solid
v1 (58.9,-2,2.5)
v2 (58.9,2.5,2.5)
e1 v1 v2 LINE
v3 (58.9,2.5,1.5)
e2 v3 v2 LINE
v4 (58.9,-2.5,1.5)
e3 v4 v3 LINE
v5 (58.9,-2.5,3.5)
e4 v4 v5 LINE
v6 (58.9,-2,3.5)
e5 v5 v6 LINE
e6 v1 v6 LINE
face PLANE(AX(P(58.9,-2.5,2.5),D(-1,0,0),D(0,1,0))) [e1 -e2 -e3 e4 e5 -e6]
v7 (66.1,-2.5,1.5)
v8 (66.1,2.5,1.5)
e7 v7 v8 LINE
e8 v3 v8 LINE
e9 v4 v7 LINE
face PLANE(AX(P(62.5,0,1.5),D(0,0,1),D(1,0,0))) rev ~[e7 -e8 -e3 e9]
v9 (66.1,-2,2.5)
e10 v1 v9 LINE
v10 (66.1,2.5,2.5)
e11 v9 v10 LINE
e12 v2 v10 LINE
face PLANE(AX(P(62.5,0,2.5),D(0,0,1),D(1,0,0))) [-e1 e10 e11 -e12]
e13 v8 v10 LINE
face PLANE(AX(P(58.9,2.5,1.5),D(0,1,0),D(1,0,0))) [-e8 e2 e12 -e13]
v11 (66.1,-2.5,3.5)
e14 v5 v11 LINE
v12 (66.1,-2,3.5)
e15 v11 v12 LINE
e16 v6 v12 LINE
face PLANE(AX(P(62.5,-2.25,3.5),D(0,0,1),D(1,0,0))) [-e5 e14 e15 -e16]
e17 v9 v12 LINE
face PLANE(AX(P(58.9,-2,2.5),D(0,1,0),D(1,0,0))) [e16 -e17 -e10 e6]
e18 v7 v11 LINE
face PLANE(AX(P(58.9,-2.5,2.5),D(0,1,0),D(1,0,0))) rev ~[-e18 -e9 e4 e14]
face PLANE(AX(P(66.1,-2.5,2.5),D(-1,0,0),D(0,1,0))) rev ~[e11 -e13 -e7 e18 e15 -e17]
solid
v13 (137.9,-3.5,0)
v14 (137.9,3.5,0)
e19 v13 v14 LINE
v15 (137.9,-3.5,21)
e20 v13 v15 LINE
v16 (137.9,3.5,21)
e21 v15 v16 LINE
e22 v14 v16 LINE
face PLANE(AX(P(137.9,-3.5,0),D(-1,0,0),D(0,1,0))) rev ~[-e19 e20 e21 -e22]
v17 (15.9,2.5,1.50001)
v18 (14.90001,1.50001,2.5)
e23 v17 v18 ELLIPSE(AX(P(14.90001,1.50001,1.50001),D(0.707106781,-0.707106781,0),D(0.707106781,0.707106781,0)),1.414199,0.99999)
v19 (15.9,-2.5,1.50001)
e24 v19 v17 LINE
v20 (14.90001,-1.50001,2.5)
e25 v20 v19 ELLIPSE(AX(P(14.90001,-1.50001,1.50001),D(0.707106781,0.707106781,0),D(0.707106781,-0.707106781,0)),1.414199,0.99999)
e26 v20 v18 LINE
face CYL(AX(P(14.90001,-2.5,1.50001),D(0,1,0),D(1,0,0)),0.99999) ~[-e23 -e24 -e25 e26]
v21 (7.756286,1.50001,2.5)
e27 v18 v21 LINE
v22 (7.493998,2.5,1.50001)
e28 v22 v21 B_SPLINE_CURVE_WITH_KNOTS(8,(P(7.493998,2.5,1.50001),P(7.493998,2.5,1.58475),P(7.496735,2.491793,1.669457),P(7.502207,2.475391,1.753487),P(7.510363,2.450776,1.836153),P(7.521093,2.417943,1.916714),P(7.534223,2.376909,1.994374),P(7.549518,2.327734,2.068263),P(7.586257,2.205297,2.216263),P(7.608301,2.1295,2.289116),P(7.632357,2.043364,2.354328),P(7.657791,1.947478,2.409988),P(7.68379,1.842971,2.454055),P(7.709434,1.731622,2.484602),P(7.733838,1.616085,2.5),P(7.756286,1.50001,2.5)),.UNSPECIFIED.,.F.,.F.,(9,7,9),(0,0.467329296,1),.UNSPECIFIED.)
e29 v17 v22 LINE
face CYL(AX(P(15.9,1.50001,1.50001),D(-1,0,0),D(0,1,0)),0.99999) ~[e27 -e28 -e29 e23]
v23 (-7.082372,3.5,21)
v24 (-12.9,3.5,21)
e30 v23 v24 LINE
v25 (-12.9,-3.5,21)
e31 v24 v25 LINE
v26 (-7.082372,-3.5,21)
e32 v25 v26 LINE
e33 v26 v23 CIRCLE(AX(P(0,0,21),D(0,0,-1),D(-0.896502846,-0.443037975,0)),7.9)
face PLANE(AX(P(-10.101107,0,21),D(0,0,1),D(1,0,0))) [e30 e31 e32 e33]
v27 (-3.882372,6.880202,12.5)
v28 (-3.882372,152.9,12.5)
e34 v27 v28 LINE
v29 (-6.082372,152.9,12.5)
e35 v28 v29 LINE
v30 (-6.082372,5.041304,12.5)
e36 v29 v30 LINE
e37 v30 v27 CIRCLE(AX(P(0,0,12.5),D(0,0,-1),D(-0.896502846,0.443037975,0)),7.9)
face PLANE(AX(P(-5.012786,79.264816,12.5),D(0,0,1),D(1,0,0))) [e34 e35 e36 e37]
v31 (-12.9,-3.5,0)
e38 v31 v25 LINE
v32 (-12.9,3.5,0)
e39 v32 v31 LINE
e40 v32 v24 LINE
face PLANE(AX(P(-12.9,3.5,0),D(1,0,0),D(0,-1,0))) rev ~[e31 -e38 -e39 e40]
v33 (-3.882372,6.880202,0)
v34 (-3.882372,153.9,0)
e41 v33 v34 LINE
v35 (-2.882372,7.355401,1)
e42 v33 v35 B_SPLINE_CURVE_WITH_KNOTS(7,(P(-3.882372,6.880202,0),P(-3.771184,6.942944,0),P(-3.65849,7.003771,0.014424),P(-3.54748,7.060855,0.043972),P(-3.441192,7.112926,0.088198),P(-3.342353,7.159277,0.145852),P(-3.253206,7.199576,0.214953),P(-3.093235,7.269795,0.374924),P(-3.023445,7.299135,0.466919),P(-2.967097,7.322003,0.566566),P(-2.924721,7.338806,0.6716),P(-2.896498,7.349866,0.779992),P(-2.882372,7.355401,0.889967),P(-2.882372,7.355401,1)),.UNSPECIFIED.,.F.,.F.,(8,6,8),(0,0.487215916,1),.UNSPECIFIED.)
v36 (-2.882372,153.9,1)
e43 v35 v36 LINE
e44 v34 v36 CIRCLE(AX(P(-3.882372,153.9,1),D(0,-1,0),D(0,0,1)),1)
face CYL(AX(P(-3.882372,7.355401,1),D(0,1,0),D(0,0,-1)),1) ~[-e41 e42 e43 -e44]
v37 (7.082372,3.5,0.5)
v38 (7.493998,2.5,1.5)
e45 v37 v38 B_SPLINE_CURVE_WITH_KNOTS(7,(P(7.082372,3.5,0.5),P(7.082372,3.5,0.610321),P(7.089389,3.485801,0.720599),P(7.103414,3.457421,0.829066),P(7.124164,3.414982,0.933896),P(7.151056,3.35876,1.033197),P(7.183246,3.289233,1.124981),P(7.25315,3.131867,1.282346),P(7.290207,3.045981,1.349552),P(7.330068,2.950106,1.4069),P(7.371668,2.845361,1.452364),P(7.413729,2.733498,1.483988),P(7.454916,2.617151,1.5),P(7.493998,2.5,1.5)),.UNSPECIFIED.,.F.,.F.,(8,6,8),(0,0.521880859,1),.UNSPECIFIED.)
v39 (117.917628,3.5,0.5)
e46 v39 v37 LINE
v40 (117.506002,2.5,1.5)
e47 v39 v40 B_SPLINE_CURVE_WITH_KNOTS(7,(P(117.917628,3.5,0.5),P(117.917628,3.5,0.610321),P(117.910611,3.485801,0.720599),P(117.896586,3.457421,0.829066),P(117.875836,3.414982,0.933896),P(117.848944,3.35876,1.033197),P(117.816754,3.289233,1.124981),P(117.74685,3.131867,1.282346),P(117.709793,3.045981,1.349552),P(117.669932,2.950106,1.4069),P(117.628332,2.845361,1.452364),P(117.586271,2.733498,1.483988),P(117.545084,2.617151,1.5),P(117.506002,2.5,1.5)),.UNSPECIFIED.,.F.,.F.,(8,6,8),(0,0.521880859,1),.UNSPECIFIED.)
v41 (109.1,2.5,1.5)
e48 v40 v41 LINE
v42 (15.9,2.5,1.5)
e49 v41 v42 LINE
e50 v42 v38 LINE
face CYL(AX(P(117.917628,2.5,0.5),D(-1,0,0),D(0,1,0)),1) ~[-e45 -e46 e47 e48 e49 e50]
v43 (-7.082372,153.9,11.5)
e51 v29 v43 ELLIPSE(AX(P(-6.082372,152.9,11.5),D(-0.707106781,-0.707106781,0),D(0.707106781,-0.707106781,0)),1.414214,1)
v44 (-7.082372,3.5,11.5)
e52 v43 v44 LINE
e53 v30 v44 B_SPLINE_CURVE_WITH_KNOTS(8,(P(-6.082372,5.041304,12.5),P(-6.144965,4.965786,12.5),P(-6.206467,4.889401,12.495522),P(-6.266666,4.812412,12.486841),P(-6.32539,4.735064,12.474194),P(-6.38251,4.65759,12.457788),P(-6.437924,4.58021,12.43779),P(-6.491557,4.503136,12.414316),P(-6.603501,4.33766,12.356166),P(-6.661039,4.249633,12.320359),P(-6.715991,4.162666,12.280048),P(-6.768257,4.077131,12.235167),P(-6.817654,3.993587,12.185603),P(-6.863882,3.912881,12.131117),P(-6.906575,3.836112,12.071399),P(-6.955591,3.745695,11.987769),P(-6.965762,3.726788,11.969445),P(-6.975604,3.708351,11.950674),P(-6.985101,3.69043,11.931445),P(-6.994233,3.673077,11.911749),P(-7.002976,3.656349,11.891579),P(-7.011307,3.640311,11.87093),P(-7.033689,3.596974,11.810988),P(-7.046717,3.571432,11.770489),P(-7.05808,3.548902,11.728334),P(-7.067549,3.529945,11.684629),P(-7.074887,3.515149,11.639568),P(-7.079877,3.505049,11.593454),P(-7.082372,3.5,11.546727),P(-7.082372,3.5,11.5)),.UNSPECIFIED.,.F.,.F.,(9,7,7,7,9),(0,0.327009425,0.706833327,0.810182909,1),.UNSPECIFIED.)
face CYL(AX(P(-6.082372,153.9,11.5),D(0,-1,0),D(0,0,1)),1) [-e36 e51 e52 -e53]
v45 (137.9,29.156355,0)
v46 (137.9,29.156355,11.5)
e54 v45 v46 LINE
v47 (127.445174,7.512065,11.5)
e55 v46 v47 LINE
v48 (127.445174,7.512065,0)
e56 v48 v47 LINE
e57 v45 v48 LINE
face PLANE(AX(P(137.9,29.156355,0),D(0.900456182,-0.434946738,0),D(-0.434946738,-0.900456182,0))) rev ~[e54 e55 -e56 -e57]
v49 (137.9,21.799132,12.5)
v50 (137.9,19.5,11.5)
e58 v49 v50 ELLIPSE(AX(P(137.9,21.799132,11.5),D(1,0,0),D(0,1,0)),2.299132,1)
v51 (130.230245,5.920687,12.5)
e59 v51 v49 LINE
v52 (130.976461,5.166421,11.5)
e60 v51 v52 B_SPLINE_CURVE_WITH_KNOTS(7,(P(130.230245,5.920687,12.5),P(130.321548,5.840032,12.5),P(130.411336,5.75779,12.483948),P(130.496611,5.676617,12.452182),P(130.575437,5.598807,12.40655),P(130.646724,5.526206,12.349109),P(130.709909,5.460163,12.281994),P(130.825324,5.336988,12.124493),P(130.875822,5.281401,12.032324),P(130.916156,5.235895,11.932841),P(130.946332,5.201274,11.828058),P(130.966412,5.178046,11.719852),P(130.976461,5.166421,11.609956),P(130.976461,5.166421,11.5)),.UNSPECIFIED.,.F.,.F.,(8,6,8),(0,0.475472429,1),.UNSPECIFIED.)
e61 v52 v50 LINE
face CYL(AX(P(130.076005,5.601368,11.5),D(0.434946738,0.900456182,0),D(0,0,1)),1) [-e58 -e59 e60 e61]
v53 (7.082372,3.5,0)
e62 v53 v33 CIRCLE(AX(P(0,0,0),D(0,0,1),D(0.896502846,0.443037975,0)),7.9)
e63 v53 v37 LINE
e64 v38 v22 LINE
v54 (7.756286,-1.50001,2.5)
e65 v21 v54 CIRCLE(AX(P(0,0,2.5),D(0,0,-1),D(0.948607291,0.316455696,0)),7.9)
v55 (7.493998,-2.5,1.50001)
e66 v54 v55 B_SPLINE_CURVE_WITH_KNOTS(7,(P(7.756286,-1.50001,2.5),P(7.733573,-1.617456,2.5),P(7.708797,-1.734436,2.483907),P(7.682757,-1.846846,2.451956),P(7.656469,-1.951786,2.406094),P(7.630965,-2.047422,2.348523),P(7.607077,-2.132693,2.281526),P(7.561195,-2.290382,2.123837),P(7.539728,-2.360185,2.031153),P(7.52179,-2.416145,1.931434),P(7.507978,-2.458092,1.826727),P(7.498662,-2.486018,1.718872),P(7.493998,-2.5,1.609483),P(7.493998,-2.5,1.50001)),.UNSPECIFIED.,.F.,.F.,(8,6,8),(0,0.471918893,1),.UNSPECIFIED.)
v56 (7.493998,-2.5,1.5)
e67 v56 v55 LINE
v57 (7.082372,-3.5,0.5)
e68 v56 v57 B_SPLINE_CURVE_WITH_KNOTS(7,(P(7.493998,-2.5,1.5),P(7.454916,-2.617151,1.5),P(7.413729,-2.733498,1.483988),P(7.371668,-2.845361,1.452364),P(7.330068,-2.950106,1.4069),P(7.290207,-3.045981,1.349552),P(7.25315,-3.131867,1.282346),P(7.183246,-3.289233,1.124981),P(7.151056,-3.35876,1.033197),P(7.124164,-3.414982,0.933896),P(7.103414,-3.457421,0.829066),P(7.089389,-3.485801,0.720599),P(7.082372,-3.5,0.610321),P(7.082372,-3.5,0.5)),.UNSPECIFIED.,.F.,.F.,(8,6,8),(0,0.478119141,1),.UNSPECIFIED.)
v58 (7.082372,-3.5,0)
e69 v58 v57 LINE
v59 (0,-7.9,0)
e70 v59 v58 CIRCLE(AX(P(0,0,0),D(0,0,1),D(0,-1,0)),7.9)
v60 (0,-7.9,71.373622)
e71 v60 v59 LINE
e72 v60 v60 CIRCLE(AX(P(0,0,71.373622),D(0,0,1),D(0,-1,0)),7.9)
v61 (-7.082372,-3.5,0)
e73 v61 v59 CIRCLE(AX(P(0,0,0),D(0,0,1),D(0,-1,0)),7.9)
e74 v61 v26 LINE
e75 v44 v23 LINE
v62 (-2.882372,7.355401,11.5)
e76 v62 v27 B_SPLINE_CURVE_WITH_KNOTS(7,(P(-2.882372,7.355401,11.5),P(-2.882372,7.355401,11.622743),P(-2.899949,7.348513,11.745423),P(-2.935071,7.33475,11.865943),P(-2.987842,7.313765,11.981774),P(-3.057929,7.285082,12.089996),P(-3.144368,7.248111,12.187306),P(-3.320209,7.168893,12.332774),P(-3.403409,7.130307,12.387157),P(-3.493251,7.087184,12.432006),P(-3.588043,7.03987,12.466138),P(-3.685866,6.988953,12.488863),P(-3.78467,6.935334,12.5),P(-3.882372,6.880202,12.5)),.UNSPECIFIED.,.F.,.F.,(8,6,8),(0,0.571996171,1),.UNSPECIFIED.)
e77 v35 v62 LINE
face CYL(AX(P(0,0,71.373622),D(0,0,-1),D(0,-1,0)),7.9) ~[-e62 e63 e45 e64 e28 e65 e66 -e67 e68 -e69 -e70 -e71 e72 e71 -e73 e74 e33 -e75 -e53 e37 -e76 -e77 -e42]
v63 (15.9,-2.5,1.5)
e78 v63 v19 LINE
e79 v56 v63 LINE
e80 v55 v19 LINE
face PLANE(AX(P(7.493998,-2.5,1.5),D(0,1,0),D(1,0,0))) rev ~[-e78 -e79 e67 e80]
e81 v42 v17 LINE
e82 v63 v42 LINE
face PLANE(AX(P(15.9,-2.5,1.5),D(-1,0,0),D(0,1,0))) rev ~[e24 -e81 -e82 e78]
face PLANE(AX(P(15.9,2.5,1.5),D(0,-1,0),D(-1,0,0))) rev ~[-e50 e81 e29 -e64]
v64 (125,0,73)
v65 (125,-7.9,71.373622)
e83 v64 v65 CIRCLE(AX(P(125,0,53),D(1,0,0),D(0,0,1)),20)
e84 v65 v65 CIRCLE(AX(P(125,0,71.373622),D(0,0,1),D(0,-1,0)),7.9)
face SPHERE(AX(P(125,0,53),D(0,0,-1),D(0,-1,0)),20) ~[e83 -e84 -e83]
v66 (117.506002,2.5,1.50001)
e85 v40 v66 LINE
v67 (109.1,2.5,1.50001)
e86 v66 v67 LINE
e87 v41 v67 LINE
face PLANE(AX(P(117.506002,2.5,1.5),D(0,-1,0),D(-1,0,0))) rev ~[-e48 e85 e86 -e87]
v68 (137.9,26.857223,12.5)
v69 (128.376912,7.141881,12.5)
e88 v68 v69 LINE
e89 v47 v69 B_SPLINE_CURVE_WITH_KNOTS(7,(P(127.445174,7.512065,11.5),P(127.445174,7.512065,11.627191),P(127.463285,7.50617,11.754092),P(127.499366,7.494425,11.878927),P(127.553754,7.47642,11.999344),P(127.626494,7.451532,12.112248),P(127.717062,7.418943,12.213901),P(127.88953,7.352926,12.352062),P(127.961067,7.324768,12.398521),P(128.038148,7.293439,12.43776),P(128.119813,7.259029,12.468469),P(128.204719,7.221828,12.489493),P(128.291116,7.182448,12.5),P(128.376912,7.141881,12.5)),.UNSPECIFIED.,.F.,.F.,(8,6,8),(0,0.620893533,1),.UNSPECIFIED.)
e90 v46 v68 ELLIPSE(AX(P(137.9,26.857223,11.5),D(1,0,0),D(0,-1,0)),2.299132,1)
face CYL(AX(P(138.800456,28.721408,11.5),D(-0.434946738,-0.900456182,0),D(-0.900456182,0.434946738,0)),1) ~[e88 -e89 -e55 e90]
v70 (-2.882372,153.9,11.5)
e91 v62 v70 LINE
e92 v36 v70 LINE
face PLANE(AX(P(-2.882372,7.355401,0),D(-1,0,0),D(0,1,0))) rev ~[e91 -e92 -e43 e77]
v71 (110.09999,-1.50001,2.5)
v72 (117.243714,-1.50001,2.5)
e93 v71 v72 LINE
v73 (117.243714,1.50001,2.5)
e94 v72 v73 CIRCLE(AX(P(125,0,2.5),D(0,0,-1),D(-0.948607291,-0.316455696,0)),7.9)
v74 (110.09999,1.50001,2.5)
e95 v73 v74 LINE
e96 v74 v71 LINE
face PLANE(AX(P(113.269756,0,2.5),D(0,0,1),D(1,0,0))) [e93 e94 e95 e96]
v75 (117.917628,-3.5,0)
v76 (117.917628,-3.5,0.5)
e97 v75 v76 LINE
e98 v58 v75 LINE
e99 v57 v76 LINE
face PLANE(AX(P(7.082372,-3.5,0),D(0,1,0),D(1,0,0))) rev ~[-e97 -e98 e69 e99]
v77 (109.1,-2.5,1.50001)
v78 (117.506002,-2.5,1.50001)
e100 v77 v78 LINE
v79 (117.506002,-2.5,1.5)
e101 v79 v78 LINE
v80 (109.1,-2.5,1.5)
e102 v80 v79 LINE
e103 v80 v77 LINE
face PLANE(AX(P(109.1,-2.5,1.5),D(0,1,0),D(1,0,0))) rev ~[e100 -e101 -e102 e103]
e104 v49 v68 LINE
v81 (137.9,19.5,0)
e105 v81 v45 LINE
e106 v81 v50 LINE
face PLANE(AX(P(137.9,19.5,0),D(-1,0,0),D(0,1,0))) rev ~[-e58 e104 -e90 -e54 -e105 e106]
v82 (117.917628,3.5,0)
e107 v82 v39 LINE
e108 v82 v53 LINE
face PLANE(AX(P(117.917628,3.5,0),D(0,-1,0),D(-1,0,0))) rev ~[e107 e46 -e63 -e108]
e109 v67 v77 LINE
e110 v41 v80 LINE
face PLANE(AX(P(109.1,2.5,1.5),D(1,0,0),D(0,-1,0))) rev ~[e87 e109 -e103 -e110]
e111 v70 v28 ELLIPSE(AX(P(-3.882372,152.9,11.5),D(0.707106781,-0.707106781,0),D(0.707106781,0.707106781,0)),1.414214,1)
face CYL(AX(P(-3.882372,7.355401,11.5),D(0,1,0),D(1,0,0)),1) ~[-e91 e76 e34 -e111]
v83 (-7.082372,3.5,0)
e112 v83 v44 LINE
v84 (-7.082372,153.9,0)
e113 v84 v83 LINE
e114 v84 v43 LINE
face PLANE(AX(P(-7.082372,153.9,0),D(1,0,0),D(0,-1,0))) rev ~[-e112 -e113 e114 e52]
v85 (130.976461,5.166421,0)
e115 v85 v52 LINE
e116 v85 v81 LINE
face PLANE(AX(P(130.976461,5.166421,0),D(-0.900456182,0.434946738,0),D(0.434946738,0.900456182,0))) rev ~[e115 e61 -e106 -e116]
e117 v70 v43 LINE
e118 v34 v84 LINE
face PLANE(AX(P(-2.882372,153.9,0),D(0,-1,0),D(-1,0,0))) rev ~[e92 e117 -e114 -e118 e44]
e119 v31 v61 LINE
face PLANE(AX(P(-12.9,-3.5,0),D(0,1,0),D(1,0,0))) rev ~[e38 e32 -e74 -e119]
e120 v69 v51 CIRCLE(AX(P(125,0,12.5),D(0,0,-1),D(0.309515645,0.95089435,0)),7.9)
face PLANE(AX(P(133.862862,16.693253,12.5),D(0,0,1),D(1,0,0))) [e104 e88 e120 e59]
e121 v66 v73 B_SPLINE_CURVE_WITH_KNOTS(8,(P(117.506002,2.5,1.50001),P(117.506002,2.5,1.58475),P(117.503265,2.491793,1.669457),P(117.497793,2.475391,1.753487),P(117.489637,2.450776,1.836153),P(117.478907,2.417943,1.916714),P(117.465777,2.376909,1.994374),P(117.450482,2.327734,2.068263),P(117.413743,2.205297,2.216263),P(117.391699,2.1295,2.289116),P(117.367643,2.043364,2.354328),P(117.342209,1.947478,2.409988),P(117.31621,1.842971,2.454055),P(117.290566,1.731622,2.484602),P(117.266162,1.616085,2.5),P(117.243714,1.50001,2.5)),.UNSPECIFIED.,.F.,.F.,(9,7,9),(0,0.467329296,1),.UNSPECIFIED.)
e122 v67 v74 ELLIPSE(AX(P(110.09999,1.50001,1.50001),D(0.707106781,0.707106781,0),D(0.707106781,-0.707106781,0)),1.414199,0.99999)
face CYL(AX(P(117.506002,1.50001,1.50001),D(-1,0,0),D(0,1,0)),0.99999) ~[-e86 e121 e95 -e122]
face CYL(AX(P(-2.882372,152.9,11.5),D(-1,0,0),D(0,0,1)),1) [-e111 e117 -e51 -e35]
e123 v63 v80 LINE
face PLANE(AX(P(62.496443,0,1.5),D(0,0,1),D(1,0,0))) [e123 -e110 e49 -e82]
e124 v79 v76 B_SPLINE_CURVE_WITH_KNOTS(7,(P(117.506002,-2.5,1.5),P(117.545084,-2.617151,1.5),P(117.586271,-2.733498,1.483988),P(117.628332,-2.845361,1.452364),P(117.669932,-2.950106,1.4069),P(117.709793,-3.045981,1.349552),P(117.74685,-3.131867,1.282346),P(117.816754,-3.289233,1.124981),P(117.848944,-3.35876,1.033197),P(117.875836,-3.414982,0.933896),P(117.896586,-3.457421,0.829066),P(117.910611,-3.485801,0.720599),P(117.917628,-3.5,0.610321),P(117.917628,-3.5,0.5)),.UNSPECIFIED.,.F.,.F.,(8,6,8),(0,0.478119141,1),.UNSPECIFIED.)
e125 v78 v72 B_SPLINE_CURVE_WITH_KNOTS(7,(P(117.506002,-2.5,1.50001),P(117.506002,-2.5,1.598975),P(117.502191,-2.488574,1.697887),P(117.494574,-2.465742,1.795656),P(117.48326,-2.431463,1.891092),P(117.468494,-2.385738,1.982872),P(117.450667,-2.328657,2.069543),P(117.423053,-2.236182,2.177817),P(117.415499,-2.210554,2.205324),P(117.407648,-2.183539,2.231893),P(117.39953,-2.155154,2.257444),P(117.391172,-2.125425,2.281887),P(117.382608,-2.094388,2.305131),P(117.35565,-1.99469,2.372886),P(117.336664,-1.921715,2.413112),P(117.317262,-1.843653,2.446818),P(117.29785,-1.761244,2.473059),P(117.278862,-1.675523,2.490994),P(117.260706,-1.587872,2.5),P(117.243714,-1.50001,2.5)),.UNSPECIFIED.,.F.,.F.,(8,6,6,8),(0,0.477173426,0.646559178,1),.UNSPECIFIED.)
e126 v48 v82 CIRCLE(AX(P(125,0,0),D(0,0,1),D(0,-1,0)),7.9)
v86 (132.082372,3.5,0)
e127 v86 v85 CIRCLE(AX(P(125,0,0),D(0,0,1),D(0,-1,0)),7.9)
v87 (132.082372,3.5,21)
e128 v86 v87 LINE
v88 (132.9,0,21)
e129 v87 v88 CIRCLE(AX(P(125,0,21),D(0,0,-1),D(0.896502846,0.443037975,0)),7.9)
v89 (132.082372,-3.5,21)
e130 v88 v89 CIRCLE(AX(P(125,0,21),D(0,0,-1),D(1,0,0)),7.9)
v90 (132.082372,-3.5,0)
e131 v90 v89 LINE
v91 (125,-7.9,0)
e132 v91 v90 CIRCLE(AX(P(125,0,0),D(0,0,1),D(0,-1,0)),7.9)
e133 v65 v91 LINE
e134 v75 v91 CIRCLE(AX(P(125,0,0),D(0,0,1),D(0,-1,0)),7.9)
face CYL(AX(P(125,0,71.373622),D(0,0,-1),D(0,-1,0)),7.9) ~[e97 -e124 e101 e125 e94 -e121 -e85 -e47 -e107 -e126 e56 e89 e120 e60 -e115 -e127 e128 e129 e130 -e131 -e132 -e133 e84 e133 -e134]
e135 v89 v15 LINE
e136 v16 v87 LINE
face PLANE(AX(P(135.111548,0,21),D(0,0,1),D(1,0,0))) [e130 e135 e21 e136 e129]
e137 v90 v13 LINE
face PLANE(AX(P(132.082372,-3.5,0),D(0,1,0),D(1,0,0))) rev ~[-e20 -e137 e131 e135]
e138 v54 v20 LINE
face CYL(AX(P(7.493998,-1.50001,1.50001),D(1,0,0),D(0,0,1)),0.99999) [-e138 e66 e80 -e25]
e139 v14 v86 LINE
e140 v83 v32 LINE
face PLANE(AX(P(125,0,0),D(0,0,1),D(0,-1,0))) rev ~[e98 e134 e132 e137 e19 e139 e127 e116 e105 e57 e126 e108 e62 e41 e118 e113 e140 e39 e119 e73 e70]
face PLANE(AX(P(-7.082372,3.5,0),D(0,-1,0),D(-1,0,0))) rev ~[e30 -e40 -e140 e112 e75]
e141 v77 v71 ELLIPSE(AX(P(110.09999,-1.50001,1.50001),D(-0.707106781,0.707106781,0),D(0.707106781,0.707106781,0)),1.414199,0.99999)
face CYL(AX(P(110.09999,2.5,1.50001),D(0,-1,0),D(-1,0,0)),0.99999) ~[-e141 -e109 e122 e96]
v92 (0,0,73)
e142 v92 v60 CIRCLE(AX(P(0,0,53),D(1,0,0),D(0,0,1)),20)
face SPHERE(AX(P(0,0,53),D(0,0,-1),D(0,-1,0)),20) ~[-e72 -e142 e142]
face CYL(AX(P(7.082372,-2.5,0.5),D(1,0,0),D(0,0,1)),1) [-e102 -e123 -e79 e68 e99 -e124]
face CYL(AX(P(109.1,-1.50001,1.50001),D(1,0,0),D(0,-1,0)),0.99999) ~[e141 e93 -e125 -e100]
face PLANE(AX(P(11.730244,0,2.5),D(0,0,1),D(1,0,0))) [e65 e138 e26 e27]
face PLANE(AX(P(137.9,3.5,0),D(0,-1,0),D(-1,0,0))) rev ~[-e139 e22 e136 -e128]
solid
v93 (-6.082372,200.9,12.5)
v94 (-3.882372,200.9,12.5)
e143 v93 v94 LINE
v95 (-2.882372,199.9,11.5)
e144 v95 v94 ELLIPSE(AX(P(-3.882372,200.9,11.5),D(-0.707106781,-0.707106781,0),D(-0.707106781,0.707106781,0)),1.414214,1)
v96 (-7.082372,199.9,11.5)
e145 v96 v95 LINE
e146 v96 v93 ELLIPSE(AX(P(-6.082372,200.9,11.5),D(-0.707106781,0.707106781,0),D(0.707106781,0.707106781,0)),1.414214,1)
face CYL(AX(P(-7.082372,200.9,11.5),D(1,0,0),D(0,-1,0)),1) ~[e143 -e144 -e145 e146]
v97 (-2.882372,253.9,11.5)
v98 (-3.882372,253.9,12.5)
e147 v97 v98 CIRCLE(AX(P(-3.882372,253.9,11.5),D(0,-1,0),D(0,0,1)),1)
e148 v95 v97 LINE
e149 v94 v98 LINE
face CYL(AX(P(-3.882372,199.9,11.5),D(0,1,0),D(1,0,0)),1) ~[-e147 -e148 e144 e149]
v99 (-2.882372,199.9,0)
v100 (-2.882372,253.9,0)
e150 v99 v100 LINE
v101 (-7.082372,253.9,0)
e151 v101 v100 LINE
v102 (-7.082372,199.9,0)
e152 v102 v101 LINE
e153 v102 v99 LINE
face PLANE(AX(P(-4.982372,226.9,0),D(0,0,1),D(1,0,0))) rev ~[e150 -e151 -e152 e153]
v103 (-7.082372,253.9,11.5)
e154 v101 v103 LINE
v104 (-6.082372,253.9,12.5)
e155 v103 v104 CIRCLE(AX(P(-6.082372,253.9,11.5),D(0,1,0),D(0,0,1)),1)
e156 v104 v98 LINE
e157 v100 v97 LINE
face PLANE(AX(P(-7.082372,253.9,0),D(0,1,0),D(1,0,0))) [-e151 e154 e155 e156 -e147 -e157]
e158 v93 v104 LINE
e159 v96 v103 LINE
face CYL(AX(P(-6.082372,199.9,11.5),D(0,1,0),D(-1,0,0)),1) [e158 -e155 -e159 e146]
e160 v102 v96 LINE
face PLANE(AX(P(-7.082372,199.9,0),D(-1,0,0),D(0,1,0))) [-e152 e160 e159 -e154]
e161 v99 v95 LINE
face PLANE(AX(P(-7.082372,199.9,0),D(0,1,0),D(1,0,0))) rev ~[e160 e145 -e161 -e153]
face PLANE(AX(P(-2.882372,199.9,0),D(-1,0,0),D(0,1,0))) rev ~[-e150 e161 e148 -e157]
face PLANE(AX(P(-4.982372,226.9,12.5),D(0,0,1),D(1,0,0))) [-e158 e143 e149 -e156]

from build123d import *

# Parameters (mm, degrees)
F1_DEPTH  = 12.5
F0_W      = 4.2
F0_H      = 54
F2_DEPTH  = 21
F8_DEPTH  = 1.5
F9_R      = 1
F11_DEPTH = 1
F10_W     = 7.2
F10_H     = 5
F12_R     = 0.99999
F13_R     = 1
F13_2_R   = 1
F14_W     = 7.2
F14_H     = 0.5
F15_DEPTH = 1


# Not quite as in the source:
# - a fillet or chamfer is up to 0.001 mm smaller than in the source, because OpenCascade refuses the exact size


with BuildPart() as f1:
    # F0 (on Top) → F1 (new body)
    with BuildSketch(Plane.XY):
        with BuildLine():
            ThreePointArc((-7.0823724839, 3.5), (-5.3422902804, 5.8197881886), (-2.8823724839, 7.3554013394))
            Line((-2.8823724839, 7.3554013394), (-2.8823724839, 153.9))
            Line((-2.8823724839, 153.9), (-7.0823724839, 153.9))
            Line((-7.0823724839, 153.9), (-7.0823724839, 3.5))
        make_face()
    extrude(amount=F1_DEPTH)

    # F0 (on Top) → F2 (join)
    with BuildSketch(Plane.XY):
        with BuildLine():
            Line((-12.9, -3.5), (-7.0823724839, -3.5))
            ThreePointArc((-7.0823724839, -3.5), (-7.9, 0), (-7.0823724839, 3.5))
            Line((-7.0823724839, 3.5), (-12.9, 3.5))
            Line((-12.9, 3.5), (-12.9, -3.5))
        make_face()
    extrude(amount=F2_DEPTH)

    # F4 (on Right) → F5 (revolve)
    with BuildSketch(Plane.YZ):
        with BuildLine():
            Line((-7.9, 71.3736223973), (-7.9, 0))
            Line((-7.9, 0), (0, 0))
            Line((0, 0), (0, 73))
            ThreePointArc((0, 73), (-4.032837218, 72.5891864041), (-7.9, 71.3736223973))
        make_face()
    revolve(axis=Axis((0, 0, 36.5), (0, 0, 1)))



with BuildPart() as f1b:
    # F0 (on Top) → F1, piece 2 (new body)
    with BuildSketch(Plane.XY):
        with Locations((-4.9823724839, 226.9)):
            Rectangle(F0_W, F0_H)
    extrude(amount=F1_DEPTH)

    # F13#2
    f13_2_edges = [f1b.edges().sort_by_distance(p)[0] for p in [
        (-2.882372, 226.9, 12.5),
        (-7.082372, 226.9, 12.5),
        (-4.982372, 199.9, 12.5),
    ]]
    fillet(f13_2_edges, radius=F13_2_R)


with BuildPart() as f1c:
    # F0 (on Top) → F1, piece 3 (new body)
    with BuildSketch(Plane.XY):
        with BuildLine():
            Line((137.9, 29.1563547549), (127.4451735987, 7.5120653666))
            ThreePointArc((127.4451735987, 7.5120653666), (129.371097675, 6.5805398802), (130.9764612849, 5.1664214413))
            Line((130.9764612849, 5.1664214413), (137.9, 19.5))
            Line((137.9, 19.5), (137.9, 29.1563547549))
        make_face()
    extrude(amount=F1_DEPTH)



with BuildPart() as f2:
    # F0 (on Top) → F2, piece 2 (new body)
    with BuildSketch(Plane.XY):
        with BuildLine():
            ThreePointArc((132.9, 0), (132.6928779602, -1.7971167711), (132.0823724839, -3.5))
            Line((132.0823724839, -3.5), (137.9, -3.5))
            Line((137.9, -3.5), (137.9, 3.5))
            Line((137.9, 3.5), (132.0823724839, 3.5))
            ThreePointArc((132.0823724839, 3.5), (132.6928779602, 1.7971167711), (132.9, 0))
        make_face()
    extrude(amount=F2_DEPTH)


with BuildPart() as f1c_1:
    add(f1c.part)

    add(f2.part)  # F7 merges F2
    # F6 (on plane+point) → F7 (revolve)
    with BuildSketch(Plane.YZ.offset(125)):
        with BuildLine():
            Line((-7.9, 0), (0, 0))
            Line((0, 0), (0, 73))
            ThreePointArc((0, 73), (-4.032837218, 72.5891864041), (-7.9, 71.3736223973))
            Line((-7.9, 71.3736223973), (-7.9, 0))
        make_face()
    revolve(axis=Axis((125, 0, 36.5), (0, 0, 1)))


with BuildPart() as f1_1:
    add(f1.part)

    add(f1c_1.part)  # F8 merges F1c
    # F0 (on Top) → F8 (join)
    with BuildSketch(Plane.XY):
        with BuildLine():
            ThreePointArc((7.0823724839, 3.5), (7.6928779602, 1.7971167711), (7.9, 0))
            ThreePointArc((7.9, 0), (7.6928779602, -1.7971167711), (7.0823724839, -3.5))
            Line((7.0823724839, -3.5), (117.9176275161, -3.5))
            ThreePointArc((117.9176275161, -3.5), (117.1, 0), (117.9176275161, 3.5))
            Line((117.9176275161, 3.5), (7.0823724839, 3.5))
        make_face()
    extrude(amount=F8_DEPTH)

    # F9
    f9_edges = [f1_1.edges().sort_by_distance(p)[0] for p in [
        (62.5, -3.5, 1.5),
        (62.5, 3.5, 1.5),
    ]]
    fillet(f9_edges, radius=F9_R)

    # F10 (on face) → F11 (join)
    with BuildSketch(Plane.XY.offset(1.5)):
        with BuildLine():
            Line((15.9, 2.5), (7.4939975981, 2.5))
            ThreePointArc((7.4939975981, 2.5), (7.9, 0), (7.4939975981, -2.5))
            Line((7.4939975981, -2.5), (15.9, -2.5))
            Line((15.9, -2.5), (15.9, 2.5))
        make_face()
        with BuildLine():
            Line((117.5060024019, 2.5), (109.1, 2.5))
            Line((109.1, 2.5), (109.1, -2.5))
            Line((109.1, -2.5), (117.5060024019, -2.5))
            ThreePointArc((117.5060024019, -2.5), (117.1, 0), (117.5060024019, 2.5))
        make_face()
    extrude(amount=F11_DEPTH)

    # F12 (radius 1 in the source; OpenCascade refuses exactly that, so slightly less here)
    f12_edges = [f1_1.edges().sort_by_distance(p)[0] for p in [
        (11.696999, -2.5, 2.5),
        (15.9, 0, 2.5),
        (11.696999, 2.5, 2.5),
        (113.303001, -2.5, 2.5),
        (109.1, 0, 2.5),
        (113.303001, 2.5, 2.5),
    ]]
    fillet(f12_edges, radius=F12_R)

    # F13
    f13_edges = [f1_1.edges().sort_by_distance(p)[0] for p in [
        (-2.882372, 80.627701, 12.5),
        (-7.082372, 78.7, 12.5),
        (-2.882372, 80.627701, 0),
        (-4.982372, 153.9, 12.5),
        (134.438231, 12.333211, 12.5),
        (132.672587, 18.33421, 12.5),
    ]]
    fillet(f13_edges, radius=F13_R)


with BuildPart() as f11:
    # F10 (on face) → F11, piece 2 (new body)
    with BuildSketch(Plane.XY.offset(1.5)):
        with Locations((62.5, 0)):
            Rectangle(F10_W, F10_H)
    extrude(amount=F11_DEPTH)

    # F14 (on face) → F15 (join)
    with BuildSketch(Plane.XY.offset(2.5)):
        with Locations((62.5, -2.25)):
            Rectangle(F14_W, F14_H)
    extrude(amount=F15_DEPTH)


solid = Compound([f1b.part, f1_1.part, f11.part])
